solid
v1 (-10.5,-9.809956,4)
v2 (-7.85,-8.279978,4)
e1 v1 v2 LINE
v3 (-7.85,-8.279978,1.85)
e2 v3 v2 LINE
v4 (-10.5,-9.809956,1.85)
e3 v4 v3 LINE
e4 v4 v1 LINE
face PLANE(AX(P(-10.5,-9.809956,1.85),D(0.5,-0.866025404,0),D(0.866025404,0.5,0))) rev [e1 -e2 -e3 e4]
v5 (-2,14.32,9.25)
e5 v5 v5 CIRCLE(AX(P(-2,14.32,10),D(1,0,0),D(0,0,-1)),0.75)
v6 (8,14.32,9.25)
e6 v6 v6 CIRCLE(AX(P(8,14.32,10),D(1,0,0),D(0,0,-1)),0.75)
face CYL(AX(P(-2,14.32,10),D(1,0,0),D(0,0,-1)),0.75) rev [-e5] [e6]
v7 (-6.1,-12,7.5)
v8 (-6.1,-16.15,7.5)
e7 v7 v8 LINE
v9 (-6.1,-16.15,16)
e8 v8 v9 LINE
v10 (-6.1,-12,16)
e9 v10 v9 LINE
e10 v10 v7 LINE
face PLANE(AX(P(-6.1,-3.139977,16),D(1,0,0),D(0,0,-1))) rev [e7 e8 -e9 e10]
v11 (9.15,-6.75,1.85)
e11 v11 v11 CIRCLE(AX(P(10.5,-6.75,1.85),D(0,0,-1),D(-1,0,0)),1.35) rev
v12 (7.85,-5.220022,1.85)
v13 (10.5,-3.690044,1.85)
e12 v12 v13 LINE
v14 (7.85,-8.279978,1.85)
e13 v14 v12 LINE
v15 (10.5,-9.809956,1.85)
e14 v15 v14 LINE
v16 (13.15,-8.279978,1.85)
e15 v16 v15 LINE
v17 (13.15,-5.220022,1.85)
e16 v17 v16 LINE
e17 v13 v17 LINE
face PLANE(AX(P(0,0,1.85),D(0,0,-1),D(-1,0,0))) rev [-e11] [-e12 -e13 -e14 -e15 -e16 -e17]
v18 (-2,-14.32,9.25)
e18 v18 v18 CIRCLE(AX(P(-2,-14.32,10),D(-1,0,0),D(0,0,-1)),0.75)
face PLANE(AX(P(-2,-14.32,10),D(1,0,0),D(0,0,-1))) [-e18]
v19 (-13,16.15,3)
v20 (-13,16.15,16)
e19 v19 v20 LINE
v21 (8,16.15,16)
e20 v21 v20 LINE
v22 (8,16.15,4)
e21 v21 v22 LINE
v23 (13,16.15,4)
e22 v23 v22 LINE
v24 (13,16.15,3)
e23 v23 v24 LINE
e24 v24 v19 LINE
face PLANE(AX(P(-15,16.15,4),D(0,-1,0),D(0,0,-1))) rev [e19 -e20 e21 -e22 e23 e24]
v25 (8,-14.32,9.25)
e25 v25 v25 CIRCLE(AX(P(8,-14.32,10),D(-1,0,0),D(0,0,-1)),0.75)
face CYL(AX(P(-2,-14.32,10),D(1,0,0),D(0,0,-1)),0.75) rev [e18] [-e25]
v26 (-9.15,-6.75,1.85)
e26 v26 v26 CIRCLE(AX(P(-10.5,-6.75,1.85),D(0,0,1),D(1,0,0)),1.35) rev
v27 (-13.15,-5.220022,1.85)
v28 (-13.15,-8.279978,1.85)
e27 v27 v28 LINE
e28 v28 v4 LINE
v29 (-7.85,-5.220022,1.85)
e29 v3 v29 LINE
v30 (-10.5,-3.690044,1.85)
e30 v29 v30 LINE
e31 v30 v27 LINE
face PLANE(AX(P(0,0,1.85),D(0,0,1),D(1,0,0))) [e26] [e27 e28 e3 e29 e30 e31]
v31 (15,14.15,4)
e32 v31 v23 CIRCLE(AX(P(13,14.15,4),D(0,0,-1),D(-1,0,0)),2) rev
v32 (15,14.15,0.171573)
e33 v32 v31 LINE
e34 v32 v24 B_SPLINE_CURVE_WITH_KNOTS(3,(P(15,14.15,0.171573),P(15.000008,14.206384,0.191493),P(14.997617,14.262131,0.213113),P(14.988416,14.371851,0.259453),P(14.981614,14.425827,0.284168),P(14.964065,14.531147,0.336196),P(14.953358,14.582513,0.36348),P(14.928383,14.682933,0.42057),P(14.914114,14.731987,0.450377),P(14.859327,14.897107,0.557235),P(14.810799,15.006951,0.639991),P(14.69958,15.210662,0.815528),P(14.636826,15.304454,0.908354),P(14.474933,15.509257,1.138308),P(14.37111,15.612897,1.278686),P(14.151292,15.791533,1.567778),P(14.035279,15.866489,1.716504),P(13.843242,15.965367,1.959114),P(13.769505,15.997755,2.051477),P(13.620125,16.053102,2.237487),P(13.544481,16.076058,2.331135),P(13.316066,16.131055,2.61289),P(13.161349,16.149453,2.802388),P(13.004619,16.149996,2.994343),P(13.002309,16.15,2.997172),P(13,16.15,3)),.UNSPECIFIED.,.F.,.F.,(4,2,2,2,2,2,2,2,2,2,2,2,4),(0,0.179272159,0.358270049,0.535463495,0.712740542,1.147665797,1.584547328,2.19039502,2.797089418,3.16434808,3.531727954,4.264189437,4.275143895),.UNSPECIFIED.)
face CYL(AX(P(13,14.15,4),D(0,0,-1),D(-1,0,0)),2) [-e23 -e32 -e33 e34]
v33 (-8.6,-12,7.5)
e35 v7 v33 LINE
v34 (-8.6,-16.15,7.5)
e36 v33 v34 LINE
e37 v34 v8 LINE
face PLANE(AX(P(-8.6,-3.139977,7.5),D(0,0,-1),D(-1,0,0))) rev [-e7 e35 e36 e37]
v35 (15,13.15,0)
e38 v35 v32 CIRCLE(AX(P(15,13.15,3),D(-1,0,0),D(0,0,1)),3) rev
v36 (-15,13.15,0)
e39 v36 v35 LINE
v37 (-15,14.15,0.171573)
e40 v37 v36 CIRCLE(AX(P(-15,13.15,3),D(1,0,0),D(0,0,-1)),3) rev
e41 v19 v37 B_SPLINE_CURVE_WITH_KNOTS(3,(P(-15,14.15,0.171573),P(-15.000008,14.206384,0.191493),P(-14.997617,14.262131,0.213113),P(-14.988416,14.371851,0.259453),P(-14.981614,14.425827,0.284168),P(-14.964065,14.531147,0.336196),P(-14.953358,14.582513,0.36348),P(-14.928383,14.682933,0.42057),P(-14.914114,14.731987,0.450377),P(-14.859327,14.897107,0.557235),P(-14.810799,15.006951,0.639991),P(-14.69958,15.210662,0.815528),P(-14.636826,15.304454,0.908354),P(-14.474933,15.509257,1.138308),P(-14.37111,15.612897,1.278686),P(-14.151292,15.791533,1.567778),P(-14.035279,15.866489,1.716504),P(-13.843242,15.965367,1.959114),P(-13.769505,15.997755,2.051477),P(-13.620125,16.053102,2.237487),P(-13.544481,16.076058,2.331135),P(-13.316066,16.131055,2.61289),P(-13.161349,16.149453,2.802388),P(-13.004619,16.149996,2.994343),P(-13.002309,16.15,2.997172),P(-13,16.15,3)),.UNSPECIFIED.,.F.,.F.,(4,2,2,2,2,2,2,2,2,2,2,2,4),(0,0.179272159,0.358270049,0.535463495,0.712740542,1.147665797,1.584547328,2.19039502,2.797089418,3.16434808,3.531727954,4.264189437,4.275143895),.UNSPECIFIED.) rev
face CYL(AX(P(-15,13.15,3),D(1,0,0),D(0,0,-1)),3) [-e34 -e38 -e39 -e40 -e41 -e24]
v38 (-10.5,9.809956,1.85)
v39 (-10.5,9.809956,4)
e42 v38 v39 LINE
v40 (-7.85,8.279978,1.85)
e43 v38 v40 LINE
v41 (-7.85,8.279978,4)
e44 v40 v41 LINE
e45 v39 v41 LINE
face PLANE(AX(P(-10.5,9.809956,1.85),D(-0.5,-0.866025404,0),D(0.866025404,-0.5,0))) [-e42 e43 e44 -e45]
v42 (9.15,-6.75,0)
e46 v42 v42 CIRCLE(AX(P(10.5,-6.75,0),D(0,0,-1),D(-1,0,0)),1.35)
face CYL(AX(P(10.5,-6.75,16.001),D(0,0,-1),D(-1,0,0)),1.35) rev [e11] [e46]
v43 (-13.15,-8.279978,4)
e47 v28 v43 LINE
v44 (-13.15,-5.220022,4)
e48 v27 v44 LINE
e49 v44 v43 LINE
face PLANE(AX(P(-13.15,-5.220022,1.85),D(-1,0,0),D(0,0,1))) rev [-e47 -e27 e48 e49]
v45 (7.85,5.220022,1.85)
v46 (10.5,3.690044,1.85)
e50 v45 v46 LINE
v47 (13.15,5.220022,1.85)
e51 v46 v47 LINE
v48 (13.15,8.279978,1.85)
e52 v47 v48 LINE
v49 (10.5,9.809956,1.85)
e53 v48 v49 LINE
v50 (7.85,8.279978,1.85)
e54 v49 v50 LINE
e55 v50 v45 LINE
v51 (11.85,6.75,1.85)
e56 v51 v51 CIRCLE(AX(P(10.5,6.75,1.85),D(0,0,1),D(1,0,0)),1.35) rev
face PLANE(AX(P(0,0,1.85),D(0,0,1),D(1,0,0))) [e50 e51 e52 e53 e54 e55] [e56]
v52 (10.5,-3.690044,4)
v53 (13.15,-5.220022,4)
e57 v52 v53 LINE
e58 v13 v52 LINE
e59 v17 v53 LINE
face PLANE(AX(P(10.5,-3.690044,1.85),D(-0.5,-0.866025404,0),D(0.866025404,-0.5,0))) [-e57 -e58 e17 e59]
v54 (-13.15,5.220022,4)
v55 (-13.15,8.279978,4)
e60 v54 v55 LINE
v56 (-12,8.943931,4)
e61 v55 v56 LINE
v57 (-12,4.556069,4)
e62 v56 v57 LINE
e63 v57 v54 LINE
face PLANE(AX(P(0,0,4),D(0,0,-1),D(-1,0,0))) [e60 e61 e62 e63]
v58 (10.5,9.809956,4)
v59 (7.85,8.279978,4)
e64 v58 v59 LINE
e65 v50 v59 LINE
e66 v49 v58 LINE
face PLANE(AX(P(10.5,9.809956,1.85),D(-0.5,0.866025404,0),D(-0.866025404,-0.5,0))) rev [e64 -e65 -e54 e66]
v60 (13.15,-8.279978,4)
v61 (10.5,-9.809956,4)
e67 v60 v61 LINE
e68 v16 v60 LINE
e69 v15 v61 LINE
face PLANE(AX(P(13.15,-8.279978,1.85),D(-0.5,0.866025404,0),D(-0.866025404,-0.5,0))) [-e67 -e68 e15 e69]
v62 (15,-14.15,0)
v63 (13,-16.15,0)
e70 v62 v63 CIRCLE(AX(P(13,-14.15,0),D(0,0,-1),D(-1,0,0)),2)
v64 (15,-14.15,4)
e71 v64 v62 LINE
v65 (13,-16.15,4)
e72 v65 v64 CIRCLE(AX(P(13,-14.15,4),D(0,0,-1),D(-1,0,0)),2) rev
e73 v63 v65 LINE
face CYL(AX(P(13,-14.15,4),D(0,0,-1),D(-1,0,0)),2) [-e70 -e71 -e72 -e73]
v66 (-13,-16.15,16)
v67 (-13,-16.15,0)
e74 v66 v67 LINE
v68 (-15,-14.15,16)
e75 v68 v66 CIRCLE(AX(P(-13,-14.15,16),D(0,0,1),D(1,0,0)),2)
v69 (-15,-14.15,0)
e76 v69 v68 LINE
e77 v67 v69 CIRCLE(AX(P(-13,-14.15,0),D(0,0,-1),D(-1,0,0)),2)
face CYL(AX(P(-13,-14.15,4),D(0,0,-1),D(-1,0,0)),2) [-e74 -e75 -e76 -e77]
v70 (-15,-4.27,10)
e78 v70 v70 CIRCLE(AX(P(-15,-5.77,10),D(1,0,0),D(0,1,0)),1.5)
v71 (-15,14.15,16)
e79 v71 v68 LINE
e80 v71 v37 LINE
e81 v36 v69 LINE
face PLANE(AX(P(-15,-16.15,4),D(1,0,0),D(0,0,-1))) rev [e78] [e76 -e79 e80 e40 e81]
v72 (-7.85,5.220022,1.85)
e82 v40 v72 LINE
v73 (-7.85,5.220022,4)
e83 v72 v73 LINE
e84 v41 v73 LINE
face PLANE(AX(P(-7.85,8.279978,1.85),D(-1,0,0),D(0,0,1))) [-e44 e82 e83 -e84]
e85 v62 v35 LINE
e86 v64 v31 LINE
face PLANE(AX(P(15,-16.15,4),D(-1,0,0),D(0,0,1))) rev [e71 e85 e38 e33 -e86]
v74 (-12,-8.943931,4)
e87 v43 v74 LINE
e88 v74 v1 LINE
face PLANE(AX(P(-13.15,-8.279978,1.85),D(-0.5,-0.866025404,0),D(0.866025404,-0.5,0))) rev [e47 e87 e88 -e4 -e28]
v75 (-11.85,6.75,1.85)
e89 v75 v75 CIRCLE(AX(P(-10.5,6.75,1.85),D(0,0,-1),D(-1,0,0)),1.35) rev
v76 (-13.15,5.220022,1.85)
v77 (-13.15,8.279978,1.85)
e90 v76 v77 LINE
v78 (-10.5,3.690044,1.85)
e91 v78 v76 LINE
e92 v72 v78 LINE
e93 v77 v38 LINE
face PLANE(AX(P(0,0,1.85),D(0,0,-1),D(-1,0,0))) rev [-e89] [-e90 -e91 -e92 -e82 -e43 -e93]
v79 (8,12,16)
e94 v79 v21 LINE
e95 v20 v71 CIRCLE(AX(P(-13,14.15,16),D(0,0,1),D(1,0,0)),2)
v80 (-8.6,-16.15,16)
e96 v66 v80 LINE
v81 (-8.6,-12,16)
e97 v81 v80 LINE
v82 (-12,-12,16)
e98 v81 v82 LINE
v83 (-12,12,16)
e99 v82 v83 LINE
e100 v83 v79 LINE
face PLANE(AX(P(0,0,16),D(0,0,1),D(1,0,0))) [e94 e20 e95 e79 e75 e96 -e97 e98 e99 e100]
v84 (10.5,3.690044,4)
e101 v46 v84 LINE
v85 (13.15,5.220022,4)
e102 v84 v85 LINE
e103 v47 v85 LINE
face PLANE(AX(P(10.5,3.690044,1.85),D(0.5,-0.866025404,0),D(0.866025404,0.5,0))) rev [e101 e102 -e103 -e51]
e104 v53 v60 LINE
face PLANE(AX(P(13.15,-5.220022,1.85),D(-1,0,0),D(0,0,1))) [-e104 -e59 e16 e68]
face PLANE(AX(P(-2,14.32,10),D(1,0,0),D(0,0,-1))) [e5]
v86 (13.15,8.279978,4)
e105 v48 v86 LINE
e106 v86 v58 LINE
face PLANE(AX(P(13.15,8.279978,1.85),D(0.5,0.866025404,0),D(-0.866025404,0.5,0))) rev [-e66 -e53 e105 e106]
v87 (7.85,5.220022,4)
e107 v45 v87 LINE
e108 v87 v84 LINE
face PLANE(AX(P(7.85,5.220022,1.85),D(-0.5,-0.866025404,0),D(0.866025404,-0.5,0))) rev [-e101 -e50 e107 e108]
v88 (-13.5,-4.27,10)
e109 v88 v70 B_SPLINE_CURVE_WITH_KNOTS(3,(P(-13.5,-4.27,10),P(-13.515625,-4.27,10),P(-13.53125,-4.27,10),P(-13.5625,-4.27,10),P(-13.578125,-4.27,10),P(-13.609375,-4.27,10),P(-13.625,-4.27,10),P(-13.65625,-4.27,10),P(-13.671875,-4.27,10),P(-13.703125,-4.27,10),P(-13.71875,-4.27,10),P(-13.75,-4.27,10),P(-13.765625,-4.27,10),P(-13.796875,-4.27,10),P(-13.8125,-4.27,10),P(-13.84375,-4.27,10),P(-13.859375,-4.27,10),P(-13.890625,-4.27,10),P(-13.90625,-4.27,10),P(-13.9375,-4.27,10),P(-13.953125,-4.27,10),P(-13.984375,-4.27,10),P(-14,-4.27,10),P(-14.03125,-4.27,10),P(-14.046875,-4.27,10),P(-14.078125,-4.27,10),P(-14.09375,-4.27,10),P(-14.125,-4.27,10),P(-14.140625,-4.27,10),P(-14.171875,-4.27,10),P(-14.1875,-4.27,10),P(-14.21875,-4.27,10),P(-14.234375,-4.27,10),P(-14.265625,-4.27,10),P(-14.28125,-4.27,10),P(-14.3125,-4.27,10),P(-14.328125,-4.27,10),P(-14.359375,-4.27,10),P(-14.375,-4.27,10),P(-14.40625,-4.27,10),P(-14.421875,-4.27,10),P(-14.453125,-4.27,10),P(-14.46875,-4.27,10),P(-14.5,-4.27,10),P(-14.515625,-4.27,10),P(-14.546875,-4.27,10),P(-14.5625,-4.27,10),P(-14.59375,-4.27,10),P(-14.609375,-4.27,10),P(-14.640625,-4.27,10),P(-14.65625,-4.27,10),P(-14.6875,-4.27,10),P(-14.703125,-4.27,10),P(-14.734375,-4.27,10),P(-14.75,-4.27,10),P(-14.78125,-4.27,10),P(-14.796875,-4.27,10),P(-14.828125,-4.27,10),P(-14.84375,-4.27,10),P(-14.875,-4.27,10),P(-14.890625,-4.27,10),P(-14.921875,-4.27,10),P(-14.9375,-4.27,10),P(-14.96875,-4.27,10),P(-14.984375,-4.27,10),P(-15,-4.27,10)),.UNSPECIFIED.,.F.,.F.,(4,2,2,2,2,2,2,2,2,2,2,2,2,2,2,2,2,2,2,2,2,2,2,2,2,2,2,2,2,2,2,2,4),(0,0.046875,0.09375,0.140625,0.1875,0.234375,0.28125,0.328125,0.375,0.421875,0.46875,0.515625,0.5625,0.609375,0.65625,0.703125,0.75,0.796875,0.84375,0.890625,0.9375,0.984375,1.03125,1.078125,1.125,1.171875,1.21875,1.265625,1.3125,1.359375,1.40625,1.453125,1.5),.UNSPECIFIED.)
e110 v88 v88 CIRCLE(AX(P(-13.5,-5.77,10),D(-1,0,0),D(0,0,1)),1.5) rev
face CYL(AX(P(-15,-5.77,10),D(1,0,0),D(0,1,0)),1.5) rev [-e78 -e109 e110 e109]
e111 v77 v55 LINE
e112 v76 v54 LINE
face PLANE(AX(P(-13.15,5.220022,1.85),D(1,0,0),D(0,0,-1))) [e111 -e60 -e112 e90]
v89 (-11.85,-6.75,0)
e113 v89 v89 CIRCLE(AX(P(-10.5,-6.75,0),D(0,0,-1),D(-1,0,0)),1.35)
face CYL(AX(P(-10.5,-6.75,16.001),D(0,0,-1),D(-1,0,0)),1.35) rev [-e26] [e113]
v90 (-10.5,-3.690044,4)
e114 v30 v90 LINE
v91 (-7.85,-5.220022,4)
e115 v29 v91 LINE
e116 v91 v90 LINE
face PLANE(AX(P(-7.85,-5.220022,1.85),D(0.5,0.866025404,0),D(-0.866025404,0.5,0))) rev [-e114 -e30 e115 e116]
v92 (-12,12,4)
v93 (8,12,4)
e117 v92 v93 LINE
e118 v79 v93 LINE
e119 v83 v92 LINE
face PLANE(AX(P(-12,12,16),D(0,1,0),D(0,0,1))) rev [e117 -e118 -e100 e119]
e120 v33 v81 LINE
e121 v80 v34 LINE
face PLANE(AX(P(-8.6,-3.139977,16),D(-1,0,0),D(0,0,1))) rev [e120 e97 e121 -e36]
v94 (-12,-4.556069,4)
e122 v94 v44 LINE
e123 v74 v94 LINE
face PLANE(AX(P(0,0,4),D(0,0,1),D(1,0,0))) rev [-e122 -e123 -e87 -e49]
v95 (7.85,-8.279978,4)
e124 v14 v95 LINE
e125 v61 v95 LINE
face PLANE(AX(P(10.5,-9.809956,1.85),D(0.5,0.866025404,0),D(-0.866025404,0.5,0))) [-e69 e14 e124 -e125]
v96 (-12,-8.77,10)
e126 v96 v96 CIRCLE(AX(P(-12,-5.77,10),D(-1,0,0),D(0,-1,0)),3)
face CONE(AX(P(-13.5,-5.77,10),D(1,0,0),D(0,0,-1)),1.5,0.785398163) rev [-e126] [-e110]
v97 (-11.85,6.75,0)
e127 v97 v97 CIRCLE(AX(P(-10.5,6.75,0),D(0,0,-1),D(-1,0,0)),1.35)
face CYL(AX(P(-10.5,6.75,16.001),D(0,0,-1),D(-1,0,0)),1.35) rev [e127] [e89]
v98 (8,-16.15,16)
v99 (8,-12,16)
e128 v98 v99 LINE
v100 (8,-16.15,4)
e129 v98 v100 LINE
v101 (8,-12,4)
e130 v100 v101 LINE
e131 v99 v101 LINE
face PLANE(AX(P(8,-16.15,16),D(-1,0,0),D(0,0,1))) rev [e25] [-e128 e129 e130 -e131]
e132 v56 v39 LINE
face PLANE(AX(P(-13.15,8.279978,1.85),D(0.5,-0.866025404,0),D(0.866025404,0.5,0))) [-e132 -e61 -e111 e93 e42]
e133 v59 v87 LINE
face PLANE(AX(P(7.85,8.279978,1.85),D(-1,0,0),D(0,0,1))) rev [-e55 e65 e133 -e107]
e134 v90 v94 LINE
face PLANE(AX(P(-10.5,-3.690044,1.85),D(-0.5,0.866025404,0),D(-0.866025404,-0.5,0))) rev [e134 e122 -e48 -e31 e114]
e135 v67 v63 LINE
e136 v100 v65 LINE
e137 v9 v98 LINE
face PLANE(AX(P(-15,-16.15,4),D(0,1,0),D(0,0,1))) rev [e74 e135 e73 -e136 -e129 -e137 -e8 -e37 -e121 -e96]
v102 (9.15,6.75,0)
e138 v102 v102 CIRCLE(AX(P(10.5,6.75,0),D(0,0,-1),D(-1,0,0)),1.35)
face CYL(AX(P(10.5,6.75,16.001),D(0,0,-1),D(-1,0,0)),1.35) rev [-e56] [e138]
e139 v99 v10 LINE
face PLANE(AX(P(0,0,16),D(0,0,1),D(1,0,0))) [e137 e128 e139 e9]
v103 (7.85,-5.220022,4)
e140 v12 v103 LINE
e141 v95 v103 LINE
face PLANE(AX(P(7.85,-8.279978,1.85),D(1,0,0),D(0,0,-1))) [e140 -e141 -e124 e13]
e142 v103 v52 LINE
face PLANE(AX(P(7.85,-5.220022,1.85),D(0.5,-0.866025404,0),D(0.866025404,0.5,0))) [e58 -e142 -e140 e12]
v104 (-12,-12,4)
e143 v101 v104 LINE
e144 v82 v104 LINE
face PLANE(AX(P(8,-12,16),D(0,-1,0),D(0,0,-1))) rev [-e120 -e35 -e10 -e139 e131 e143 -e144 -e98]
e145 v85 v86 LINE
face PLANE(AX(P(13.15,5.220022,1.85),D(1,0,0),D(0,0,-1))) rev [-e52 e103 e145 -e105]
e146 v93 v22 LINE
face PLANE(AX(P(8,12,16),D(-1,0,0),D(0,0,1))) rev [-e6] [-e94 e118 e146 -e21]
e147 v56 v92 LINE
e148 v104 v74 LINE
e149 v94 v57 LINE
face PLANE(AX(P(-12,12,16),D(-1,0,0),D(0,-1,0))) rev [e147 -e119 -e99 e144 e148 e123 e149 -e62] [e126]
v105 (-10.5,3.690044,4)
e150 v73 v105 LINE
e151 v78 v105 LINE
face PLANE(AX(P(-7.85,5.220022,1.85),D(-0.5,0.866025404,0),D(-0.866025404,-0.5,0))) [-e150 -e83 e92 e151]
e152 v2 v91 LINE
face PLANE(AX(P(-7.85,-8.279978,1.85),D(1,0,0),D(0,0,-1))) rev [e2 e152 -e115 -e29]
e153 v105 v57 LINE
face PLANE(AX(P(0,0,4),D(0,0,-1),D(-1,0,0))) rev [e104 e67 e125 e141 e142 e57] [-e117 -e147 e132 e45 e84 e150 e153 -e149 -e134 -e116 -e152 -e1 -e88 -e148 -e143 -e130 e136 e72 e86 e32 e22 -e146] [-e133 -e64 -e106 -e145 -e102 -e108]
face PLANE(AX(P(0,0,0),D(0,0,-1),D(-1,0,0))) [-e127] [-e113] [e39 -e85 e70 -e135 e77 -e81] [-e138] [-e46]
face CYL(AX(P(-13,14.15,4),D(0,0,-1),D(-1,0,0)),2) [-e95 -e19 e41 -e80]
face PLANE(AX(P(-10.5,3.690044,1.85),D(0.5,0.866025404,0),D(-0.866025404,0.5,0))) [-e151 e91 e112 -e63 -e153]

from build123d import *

# Parameters (mm, degrees)
SKETCH_1_W             = 30
SKETCH_1_H             = 32.3
EXTRUDE_417_DEPTH      = 4
EXTRUDE_710_DEPTH      = 12
SKETCH_4_R             = 1.5
CUT_EXTRUDE_1014_DEPTH = 36.296210845
CHAMFER_1_SIZE         = 1.5
SKETCH_3_R             = 0.75
CUT_EXTRUDE_1313_DEPTH = 10
SKETCH_5_W             = 2.5
SKETCH_5_H             = 8.5
CUT_EXTRUDE_1575_DEPTH = 4.15
FILLET_1_R             = 2
CUT_EXTRUDE_2459_REACH = 29.236
SKETCH_7_R             = 1.35
CUT_EXTRUDE_3094_DEPTH = 2.15
FILLET_2_R             = 3


with BuildPart() as part:
    # Эскиз1 → Extrude 417 (new body)
    with BuildSketch(Plane.XY):
        Rectangle(SKETCH_1_W, SKETCH_1_H)
    extrude(amount=EXTRUDE_417_DEPTH)

    # Эскиз2 → Extrude 710 (add)
    with BuildSketch(Plane.XY.offset(4)):
        Polygon((8, 16.15), (-15, 16.15), (-15, -16.15), (8, -16.15), (8, -12), (-12, -12), (-12, 12), (8, 12), align=None)
    extrude(amount=EXTRUDE_710_DEPTH)

    # Эскиз4 → Cut-Extrude 1014 (cut, through all)
    with BuildSketch(Plane(origin=(-12, 0, 0), x_dir=(0, 0, -1), z_dir=(1, 0, 0))):
        with Locations(Location((-10, -5.77, 0), (0, 0, 90))):
            Circle(SKETCH_4_R)
    extrude(amount=-CUT_EXTRUDE_1014_DEPTH, mode=Mode.SUBTRACT)

    # Фаска1
    chamfer_1_edges = [part.edges().sort_by_distance(p)[0] for p in [
        (-12, -7.27, 10),
    ]]
    chamfer(chamfer_1_edges, length=CHAMFER_1_SIZE)

    # Эскиз3 → Cut-Extrude 1313 (cut)
    with BuildSketch(Plane(origin=(8, 0, 0), x_dir=(0, 0, -1), z_dir=(1, 0, 0))):
        with Locations((-10, 14.32)):
            Circle(SKETCH_3_R)
    cut_extrude_1313 = extrude(amount=-CUT_EXTRUDE_1313_DEPTH, mode=Mode.SUBTRACT)

    # Зеркальное отражение2: Cut-Extrude 1313 across plane
    add(cut_extrude_1313.mirror(Plane.ZX), mode=Mode.SUBTRACT)

    # Эскиз5 → Cut-Extrude 1575 (cut)
    with BuildSketch(Plane.XZ.offset(16.15)):
        with Locations((-7.35, 11.75)):
            Rectangle(SKETCH_5_W, SKETCH_5_H)
    extrude(amount=-CUT_EXTRUDE_1575_DEPTH, mode=Mode.SUBTRACT)

    # Скругление1
    fillet_1_edges = [part.edges().sort_by_distance(p)[0] for p in [
        (15, -16.15, 2),
        (-15, -16.15, 8),
        (-15, 16.15, 8),
        (15, 16.15, 2),
    ]]
    fillet(fillet_1_edges, radius=FILLET_1_R)

    # Эскиз7 → Cut-Extrude 2459 (cut, up to next)
    with BuildSketch(Plane(origin=(0, 0, 0), x_dir=(-1, 0, 0), z_dir=(0, 0, -1)), mode=Mode.PRIVATE) as cut_extrude_2459_sk1:
        with Locations((10.5, 6.75)):
            Circle(SKETCH_7_R)
    cut_extrude_2459_tool1 = extrude(cut_extrude_2459_sk1.sketch, amount=-CUT_EXTRUDE_2459_REACH, mode=Mode.PRIVATE) & part.part
    # Эскиз7 → Cut-Extrude 2459 (cut, up to next)
    with BuildSketch(Plane(origin=(0, 0, 0), x_dir=(-1, 0, 0), z_dir=(0, 0, -1)), mode=Mode.PRIVATE) as cut_extrude_2459_sk2:
        with Locations((-10.5, 6.75)):
            Circle(SKETCH_7_R)
    cut_extrude_2459_tool2 = extrude(cut_extrude_2459_sk2.sketch, amount=-CUT_EXTRUDE_2459_REACH, mode=Mode.PRIVATE) & part.part
    # Эскиз7 → Cut-Extrude 2459 (cut, up to next)
    with BuildSketch(Plane(origin=(0, 0, 0), x_dir=(-1, 0, 0), z_dir=(0, 0, -1)), mode=Mode.PRIVATE) as cut_extrude_2459_sk3:
        with Locations((-10.5, -6.75)):
            Circle(SKETCH_7_R)
    cut_extrude_2459_tool3 = extrude(cut_extrude_2459_sk3.sketch, amount=-CUT_EXTRUDE_2459_REACH, mode=Mode.PRIVATE) & part.part
    # Эскиз7 → Cut-Extrude 2459 (cut, up to next)
    with BuildSketch(Plane(origin=(0, 0, 0), x_dir=(-1, 0, 0), z_dir=(0, 0, -1)), mode=Mode.PRIVATE) as cut_extrude_2459_sk4:
        with Locations((10.5, -6.75)):
            Circle(SKETCH_7_R)
    cut_extrude_2459_tool4 = extrude(cut_extrude_2459_sk4.sketch, amount=-CUT_EXTRUDE_2459_REACH, mode=Mode.PRIVATE) & part.part
    add(cut_extrude_2459_tool1.solids().sort_by_distance((-10.5, 6.75, 0))[0], mode=Mode.SUBTRACT)
    add(cut_extrude_2459_tool2.solids().sort_by_distance((10.5, 6.75, 0))[0], mode=Mode.SUBTRACT)
    add(cut_extrude_2459_tool3.solids().sort_by_distance((10.5, -6.75, 0))[0], mode=Mode.SUBTRACT)
    add(cut_extrude_2459_tool4.solids().sort_by_distance((-10.5, -6.75, 0))[0], mode=Mode.SUBTRACT)

    # Эскиз8 → Cut-Extrude 3094 (cut)
    with BuildSketch(Plane.XY.offset(4)):
        Polygon((10.5, 9.809956427), (7.85, 8.279978213), (7.85, 5.220021787), (10.5, 3.690043573), (13.15, 5.220021787), (13.15, 8.279978213), align=None)
        Polygon((-13.15, 8.279978213), (-10.5, 9.809956427), (-7.85, 8.279978213), (-7.85, 5.220021787), (-10.5, 3.690043573), (-13.15, 5.220021787), align=None)
        Polygon((-10.5, -9.809956427), (-7.85, -8.279978213), (-7.85, -5.220021787), (-10.5, -3.690043573), (-13.15, -5.220021787), (-13.15, -8.279978213), align=None)
        Polygon((13.15, -8.279978213), (10.5, -9.809956427), (7.85, -8.279978213), (7.85, -5.220021787), (10.5, -3.690043573), (13.15, -5.220021787), align=None)
    extrude(amount=-CUT_EXTRUDE_3094_DEPTH, mode=Mode.SUBTRACT)

    # Скругление2
    # the kernel refuses this fillet: 3 mm, written as the material it takes off along each edge
    with BuildSketch(Plane(origin=(20.5, 16.15, 0), x_dir=(0, -1, 0), z_dir=(-1, 0, 0))) as fillet_2_piece_1:
        with BuildLine():
            CenterArc((FILLET_2_R, FILLET_2_R), FILLET_2_R, 180, 90)
            Line((0, FILLET_2_R), (0, 0))
            Line((0, 0), (FILLET_2_R, 0))
        make_face()
    extrude(amount=41, mode=Mode.SUBTRACT)


solid = part.part
